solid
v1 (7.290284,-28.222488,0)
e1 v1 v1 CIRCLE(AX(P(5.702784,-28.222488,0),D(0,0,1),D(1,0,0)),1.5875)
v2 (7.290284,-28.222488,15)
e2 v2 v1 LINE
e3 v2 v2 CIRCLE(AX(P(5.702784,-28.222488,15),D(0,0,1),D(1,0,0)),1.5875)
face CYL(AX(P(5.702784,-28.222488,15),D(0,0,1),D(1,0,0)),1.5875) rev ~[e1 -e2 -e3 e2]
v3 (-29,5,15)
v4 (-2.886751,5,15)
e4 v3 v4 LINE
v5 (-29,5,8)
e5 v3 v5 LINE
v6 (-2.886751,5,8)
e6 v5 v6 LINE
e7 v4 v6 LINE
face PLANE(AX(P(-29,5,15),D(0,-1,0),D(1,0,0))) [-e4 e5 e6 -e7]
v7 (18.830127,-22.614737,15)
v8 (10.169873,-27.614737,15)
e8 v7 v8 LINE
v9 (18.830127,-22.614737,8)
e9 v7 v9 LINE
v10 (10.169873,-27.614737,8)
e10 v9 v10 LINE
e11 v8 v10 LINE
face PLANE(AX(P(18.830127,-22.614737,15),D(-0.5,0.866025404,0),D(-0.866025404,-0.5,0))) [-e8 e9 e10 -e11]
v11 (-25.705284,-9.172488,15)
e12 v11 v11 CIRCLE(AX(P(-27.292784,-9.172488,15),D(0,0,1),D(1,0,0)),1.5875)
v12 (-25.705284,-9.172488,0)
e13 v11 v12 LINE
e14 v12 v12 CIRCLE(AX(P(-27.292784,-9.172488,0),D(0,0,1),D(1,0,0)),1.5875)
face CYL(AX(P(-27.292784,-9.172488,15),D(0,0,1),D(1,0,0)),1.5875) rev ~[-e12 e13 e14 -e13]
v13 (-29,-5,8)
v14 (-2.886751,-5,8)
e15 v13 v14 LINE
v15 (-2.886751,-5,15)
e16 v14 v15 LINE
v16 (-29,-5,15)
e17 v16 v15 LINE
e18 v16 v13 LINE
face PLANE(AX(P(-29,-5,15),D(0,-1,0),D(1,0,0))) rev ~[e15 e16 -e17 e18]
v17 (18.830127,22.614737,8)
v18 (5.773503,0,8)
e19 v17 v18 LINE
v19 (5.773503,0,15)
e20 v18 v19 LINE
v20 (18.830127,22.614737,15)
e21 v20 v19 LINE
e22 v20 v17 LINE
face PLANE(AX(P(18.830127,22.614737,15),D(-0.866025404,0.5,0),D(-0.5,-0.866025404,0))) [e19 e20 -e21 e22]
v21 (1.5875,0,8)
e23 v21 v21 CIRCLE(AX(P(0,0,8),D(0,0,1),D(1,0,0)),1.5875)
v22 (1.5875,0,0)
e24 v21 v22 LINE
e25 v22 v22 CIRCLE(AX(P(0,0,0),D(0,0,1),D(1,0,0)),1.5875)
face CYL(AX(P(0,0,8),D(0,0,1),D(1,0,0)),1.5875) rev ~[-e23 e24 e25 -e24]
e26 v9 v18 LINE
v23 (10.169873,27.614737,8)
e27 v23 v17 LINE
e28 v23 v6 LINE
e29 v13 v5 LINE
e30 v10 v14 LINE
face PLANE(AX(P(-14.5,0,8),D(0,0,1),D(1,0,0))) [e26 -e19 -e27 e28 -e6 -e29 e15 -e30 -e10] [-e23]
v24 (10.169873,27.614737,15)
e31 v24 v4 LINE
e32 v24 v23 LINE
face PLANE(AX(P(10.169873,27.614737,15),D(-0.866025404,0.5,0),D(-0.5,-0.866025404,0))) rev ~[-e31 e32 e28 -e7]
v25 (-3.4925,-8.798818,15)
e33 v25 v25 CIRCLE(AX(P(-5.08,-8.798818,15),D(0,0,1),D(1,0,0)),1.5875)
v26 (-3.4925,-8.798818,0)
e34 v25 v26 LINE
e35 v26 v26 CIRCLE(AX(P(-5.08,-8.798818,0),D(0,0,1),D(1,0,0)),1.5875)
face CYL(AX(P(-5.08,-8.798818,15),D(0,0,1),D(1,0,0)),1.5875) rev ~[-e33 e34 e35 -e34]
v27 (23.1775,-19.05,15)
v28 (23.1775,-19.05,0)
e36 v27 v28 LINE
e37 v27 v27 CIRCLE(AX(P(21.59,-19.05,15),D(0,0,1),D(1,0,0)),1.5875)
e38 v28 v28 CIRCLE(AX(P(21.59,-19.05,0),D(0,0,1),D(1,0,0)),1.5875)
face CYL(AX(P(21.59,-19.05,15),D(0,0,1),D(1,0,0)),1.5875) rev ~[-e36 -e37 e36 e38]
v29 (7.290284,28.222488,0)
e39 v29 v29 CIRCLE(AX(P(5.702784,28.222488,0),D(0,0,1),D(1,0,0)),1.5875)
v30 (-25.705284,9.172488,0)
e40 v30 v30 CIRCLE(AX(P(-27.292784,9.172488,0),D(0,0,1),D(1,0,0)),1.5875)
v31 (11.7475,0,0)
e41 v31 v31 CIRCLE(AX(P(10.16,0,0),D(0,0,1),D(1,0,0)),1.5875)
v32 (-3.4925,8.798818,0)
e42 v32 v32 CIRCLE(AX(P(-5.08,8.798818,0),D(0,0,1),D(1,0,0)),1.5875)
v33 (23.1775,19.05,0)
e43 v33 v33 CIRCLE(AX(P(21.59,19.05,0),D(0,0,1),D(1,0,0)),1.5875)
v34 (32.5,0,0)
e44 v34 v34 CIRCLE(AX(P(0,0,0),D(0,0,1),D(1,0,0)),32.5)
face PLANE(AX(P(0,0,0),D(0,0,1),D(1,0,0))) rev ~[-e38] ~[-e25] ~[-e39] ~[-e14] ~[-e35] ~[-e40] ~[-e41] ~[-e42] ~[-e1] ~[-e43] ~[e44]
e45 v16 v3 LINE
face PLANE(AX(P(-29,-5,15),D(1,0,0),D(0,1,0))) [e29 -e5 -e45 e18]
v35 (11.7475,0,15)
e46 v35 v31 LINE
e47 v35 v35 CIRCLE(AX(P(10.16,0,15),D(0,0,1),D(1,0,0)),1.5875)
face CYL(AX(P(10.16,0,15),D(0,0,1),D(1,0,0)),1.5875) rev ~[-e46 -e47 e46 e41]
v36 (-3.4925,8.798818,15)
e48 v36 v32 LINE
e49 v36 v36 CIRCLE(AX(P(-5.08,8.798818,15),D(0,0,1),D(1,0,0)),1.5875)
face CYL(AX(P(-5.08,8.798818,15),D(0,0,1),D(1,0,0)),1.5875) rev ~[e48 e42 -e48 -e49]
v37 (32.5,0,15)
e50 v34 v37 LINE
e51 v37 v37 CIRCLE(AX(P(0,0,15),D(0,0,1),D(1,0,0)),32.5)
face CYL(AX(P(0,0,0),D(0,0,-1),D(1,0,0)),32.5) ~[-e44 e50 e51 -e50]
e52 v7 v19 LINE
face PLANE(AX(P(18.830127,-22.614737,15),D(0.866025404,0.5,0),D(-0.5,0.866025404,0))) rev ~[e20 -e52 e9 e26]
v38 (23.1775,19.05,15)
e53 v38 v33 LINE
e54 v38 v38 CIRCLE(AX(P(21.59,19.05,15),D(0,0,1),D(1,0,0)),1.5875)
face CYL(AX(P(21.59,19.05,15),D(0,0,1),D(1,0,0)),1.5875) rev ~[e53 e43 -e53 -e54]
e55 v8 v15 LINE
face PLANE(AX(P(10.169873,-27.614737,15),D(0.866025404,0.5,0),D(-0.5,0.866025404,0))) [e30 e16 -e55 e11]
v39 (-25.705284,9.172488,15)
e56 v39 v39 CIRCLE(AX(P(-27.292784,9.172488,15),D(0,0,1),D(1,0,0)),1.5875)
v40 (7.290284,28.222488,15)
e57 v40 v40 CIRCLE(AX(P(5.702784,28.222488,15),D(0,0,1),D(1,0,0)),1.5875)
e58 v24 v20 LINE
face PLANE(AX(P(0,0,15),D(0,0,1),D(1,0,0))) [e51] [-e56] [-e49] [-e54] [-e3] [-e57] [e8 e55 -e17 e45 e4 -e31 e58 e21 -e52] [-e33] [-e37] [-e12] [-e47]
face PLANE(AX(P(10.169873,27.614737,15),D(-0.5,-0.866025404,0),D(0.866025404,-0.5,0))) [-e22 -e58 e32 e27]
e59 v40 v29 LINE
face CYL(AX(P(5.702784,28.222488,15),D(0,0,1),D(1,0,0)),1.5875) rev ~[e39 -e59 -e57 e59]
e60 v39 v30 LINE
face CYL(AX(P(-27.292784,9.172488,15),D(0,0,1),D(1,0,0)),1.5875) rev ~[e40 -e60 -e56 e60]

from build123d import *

# Parameters (mm, degrees)
F0_R            = 32.5
F1_DEPTH        = 15
F2_W            = 29
F2_H            = 10
F3_DEPTH        = 7
F3_COPIES_COUNT = 3
F4_R            = 1.5875
F5_DEPTH        = 25.4
F6_R            = 1.5875
F7_DEPTH        = 25.4


# Not quite as in the source:
# - a pattern or mirror of a feature is missing from the dataset's text; its kind, count and spacing are read off the source's solid


with BuildPart() as f1:
    # F0 (on Top) → F1 (new body)
    with BuildSketch(Plane.XY):
        Circle(F0_R)
    extrude(amount=F1_DEPTH)

    # F2 (on face) → F3 (cut)
    with BuildSketch(Plane.XY.offset(15)):
        with Locations((-14.5, 0)):
            Rectangle(F2_W, F2_H)
    f3 = extrude(amount=-F3_DEPTH, mode=Mode.SUBTRACT)

    # F3_copies: F3 ×3 about axis
    f3_copies_axis = Axis((0, 0, 0), (0, 0, 1))
    for i in range(1, F3_COPIES_COUNT):
        add(f3.rotate(f3_copies_axis, i * 360 / F3_COPIES_COUNT), mode=Mode.SUBTRACT)

    # F4 (on face) → F5 (cut)
    with BuildSketch(Plane.XY.offset(8)):
        Circle(F4_R)
    extrude(amount=-F5_DEPTH, mode=Mode.SUBTRACT)

    # F6 (on face) → F7 (cut)
    with BuildSketch(Plane.XY.offset(15)):
        with Locations((10.16, 0)):
            Circle(F6_R)
        with Locations((21.59, 19.05)):
            Circle(F6_R)
        with Locations((21.59, -19.05)):
            Circle(F6_R)
        with Locations((-5.08, 8.7988181024)):
            Circle(F6_R)
        with Locations((5.7027839421, 28.2224884677)):
            Circle(F6_R)
        with Locations((-27.2927839421, 9.1724884677)):
            Circle(F6_R)
        with Locations((-27.2927839421, -9.1724884677)):
            Circle(F6_R)
        with Locations((-5.08, -8.7988181024)):
            Circle(F6_R)
        with Locations((5.7027839421, -28.2224884677)):
            Circle(F6_R)
    extrude(amount=-F7_DEPTH, mode=Mode.SUBTRACT)


solid = f1.part
